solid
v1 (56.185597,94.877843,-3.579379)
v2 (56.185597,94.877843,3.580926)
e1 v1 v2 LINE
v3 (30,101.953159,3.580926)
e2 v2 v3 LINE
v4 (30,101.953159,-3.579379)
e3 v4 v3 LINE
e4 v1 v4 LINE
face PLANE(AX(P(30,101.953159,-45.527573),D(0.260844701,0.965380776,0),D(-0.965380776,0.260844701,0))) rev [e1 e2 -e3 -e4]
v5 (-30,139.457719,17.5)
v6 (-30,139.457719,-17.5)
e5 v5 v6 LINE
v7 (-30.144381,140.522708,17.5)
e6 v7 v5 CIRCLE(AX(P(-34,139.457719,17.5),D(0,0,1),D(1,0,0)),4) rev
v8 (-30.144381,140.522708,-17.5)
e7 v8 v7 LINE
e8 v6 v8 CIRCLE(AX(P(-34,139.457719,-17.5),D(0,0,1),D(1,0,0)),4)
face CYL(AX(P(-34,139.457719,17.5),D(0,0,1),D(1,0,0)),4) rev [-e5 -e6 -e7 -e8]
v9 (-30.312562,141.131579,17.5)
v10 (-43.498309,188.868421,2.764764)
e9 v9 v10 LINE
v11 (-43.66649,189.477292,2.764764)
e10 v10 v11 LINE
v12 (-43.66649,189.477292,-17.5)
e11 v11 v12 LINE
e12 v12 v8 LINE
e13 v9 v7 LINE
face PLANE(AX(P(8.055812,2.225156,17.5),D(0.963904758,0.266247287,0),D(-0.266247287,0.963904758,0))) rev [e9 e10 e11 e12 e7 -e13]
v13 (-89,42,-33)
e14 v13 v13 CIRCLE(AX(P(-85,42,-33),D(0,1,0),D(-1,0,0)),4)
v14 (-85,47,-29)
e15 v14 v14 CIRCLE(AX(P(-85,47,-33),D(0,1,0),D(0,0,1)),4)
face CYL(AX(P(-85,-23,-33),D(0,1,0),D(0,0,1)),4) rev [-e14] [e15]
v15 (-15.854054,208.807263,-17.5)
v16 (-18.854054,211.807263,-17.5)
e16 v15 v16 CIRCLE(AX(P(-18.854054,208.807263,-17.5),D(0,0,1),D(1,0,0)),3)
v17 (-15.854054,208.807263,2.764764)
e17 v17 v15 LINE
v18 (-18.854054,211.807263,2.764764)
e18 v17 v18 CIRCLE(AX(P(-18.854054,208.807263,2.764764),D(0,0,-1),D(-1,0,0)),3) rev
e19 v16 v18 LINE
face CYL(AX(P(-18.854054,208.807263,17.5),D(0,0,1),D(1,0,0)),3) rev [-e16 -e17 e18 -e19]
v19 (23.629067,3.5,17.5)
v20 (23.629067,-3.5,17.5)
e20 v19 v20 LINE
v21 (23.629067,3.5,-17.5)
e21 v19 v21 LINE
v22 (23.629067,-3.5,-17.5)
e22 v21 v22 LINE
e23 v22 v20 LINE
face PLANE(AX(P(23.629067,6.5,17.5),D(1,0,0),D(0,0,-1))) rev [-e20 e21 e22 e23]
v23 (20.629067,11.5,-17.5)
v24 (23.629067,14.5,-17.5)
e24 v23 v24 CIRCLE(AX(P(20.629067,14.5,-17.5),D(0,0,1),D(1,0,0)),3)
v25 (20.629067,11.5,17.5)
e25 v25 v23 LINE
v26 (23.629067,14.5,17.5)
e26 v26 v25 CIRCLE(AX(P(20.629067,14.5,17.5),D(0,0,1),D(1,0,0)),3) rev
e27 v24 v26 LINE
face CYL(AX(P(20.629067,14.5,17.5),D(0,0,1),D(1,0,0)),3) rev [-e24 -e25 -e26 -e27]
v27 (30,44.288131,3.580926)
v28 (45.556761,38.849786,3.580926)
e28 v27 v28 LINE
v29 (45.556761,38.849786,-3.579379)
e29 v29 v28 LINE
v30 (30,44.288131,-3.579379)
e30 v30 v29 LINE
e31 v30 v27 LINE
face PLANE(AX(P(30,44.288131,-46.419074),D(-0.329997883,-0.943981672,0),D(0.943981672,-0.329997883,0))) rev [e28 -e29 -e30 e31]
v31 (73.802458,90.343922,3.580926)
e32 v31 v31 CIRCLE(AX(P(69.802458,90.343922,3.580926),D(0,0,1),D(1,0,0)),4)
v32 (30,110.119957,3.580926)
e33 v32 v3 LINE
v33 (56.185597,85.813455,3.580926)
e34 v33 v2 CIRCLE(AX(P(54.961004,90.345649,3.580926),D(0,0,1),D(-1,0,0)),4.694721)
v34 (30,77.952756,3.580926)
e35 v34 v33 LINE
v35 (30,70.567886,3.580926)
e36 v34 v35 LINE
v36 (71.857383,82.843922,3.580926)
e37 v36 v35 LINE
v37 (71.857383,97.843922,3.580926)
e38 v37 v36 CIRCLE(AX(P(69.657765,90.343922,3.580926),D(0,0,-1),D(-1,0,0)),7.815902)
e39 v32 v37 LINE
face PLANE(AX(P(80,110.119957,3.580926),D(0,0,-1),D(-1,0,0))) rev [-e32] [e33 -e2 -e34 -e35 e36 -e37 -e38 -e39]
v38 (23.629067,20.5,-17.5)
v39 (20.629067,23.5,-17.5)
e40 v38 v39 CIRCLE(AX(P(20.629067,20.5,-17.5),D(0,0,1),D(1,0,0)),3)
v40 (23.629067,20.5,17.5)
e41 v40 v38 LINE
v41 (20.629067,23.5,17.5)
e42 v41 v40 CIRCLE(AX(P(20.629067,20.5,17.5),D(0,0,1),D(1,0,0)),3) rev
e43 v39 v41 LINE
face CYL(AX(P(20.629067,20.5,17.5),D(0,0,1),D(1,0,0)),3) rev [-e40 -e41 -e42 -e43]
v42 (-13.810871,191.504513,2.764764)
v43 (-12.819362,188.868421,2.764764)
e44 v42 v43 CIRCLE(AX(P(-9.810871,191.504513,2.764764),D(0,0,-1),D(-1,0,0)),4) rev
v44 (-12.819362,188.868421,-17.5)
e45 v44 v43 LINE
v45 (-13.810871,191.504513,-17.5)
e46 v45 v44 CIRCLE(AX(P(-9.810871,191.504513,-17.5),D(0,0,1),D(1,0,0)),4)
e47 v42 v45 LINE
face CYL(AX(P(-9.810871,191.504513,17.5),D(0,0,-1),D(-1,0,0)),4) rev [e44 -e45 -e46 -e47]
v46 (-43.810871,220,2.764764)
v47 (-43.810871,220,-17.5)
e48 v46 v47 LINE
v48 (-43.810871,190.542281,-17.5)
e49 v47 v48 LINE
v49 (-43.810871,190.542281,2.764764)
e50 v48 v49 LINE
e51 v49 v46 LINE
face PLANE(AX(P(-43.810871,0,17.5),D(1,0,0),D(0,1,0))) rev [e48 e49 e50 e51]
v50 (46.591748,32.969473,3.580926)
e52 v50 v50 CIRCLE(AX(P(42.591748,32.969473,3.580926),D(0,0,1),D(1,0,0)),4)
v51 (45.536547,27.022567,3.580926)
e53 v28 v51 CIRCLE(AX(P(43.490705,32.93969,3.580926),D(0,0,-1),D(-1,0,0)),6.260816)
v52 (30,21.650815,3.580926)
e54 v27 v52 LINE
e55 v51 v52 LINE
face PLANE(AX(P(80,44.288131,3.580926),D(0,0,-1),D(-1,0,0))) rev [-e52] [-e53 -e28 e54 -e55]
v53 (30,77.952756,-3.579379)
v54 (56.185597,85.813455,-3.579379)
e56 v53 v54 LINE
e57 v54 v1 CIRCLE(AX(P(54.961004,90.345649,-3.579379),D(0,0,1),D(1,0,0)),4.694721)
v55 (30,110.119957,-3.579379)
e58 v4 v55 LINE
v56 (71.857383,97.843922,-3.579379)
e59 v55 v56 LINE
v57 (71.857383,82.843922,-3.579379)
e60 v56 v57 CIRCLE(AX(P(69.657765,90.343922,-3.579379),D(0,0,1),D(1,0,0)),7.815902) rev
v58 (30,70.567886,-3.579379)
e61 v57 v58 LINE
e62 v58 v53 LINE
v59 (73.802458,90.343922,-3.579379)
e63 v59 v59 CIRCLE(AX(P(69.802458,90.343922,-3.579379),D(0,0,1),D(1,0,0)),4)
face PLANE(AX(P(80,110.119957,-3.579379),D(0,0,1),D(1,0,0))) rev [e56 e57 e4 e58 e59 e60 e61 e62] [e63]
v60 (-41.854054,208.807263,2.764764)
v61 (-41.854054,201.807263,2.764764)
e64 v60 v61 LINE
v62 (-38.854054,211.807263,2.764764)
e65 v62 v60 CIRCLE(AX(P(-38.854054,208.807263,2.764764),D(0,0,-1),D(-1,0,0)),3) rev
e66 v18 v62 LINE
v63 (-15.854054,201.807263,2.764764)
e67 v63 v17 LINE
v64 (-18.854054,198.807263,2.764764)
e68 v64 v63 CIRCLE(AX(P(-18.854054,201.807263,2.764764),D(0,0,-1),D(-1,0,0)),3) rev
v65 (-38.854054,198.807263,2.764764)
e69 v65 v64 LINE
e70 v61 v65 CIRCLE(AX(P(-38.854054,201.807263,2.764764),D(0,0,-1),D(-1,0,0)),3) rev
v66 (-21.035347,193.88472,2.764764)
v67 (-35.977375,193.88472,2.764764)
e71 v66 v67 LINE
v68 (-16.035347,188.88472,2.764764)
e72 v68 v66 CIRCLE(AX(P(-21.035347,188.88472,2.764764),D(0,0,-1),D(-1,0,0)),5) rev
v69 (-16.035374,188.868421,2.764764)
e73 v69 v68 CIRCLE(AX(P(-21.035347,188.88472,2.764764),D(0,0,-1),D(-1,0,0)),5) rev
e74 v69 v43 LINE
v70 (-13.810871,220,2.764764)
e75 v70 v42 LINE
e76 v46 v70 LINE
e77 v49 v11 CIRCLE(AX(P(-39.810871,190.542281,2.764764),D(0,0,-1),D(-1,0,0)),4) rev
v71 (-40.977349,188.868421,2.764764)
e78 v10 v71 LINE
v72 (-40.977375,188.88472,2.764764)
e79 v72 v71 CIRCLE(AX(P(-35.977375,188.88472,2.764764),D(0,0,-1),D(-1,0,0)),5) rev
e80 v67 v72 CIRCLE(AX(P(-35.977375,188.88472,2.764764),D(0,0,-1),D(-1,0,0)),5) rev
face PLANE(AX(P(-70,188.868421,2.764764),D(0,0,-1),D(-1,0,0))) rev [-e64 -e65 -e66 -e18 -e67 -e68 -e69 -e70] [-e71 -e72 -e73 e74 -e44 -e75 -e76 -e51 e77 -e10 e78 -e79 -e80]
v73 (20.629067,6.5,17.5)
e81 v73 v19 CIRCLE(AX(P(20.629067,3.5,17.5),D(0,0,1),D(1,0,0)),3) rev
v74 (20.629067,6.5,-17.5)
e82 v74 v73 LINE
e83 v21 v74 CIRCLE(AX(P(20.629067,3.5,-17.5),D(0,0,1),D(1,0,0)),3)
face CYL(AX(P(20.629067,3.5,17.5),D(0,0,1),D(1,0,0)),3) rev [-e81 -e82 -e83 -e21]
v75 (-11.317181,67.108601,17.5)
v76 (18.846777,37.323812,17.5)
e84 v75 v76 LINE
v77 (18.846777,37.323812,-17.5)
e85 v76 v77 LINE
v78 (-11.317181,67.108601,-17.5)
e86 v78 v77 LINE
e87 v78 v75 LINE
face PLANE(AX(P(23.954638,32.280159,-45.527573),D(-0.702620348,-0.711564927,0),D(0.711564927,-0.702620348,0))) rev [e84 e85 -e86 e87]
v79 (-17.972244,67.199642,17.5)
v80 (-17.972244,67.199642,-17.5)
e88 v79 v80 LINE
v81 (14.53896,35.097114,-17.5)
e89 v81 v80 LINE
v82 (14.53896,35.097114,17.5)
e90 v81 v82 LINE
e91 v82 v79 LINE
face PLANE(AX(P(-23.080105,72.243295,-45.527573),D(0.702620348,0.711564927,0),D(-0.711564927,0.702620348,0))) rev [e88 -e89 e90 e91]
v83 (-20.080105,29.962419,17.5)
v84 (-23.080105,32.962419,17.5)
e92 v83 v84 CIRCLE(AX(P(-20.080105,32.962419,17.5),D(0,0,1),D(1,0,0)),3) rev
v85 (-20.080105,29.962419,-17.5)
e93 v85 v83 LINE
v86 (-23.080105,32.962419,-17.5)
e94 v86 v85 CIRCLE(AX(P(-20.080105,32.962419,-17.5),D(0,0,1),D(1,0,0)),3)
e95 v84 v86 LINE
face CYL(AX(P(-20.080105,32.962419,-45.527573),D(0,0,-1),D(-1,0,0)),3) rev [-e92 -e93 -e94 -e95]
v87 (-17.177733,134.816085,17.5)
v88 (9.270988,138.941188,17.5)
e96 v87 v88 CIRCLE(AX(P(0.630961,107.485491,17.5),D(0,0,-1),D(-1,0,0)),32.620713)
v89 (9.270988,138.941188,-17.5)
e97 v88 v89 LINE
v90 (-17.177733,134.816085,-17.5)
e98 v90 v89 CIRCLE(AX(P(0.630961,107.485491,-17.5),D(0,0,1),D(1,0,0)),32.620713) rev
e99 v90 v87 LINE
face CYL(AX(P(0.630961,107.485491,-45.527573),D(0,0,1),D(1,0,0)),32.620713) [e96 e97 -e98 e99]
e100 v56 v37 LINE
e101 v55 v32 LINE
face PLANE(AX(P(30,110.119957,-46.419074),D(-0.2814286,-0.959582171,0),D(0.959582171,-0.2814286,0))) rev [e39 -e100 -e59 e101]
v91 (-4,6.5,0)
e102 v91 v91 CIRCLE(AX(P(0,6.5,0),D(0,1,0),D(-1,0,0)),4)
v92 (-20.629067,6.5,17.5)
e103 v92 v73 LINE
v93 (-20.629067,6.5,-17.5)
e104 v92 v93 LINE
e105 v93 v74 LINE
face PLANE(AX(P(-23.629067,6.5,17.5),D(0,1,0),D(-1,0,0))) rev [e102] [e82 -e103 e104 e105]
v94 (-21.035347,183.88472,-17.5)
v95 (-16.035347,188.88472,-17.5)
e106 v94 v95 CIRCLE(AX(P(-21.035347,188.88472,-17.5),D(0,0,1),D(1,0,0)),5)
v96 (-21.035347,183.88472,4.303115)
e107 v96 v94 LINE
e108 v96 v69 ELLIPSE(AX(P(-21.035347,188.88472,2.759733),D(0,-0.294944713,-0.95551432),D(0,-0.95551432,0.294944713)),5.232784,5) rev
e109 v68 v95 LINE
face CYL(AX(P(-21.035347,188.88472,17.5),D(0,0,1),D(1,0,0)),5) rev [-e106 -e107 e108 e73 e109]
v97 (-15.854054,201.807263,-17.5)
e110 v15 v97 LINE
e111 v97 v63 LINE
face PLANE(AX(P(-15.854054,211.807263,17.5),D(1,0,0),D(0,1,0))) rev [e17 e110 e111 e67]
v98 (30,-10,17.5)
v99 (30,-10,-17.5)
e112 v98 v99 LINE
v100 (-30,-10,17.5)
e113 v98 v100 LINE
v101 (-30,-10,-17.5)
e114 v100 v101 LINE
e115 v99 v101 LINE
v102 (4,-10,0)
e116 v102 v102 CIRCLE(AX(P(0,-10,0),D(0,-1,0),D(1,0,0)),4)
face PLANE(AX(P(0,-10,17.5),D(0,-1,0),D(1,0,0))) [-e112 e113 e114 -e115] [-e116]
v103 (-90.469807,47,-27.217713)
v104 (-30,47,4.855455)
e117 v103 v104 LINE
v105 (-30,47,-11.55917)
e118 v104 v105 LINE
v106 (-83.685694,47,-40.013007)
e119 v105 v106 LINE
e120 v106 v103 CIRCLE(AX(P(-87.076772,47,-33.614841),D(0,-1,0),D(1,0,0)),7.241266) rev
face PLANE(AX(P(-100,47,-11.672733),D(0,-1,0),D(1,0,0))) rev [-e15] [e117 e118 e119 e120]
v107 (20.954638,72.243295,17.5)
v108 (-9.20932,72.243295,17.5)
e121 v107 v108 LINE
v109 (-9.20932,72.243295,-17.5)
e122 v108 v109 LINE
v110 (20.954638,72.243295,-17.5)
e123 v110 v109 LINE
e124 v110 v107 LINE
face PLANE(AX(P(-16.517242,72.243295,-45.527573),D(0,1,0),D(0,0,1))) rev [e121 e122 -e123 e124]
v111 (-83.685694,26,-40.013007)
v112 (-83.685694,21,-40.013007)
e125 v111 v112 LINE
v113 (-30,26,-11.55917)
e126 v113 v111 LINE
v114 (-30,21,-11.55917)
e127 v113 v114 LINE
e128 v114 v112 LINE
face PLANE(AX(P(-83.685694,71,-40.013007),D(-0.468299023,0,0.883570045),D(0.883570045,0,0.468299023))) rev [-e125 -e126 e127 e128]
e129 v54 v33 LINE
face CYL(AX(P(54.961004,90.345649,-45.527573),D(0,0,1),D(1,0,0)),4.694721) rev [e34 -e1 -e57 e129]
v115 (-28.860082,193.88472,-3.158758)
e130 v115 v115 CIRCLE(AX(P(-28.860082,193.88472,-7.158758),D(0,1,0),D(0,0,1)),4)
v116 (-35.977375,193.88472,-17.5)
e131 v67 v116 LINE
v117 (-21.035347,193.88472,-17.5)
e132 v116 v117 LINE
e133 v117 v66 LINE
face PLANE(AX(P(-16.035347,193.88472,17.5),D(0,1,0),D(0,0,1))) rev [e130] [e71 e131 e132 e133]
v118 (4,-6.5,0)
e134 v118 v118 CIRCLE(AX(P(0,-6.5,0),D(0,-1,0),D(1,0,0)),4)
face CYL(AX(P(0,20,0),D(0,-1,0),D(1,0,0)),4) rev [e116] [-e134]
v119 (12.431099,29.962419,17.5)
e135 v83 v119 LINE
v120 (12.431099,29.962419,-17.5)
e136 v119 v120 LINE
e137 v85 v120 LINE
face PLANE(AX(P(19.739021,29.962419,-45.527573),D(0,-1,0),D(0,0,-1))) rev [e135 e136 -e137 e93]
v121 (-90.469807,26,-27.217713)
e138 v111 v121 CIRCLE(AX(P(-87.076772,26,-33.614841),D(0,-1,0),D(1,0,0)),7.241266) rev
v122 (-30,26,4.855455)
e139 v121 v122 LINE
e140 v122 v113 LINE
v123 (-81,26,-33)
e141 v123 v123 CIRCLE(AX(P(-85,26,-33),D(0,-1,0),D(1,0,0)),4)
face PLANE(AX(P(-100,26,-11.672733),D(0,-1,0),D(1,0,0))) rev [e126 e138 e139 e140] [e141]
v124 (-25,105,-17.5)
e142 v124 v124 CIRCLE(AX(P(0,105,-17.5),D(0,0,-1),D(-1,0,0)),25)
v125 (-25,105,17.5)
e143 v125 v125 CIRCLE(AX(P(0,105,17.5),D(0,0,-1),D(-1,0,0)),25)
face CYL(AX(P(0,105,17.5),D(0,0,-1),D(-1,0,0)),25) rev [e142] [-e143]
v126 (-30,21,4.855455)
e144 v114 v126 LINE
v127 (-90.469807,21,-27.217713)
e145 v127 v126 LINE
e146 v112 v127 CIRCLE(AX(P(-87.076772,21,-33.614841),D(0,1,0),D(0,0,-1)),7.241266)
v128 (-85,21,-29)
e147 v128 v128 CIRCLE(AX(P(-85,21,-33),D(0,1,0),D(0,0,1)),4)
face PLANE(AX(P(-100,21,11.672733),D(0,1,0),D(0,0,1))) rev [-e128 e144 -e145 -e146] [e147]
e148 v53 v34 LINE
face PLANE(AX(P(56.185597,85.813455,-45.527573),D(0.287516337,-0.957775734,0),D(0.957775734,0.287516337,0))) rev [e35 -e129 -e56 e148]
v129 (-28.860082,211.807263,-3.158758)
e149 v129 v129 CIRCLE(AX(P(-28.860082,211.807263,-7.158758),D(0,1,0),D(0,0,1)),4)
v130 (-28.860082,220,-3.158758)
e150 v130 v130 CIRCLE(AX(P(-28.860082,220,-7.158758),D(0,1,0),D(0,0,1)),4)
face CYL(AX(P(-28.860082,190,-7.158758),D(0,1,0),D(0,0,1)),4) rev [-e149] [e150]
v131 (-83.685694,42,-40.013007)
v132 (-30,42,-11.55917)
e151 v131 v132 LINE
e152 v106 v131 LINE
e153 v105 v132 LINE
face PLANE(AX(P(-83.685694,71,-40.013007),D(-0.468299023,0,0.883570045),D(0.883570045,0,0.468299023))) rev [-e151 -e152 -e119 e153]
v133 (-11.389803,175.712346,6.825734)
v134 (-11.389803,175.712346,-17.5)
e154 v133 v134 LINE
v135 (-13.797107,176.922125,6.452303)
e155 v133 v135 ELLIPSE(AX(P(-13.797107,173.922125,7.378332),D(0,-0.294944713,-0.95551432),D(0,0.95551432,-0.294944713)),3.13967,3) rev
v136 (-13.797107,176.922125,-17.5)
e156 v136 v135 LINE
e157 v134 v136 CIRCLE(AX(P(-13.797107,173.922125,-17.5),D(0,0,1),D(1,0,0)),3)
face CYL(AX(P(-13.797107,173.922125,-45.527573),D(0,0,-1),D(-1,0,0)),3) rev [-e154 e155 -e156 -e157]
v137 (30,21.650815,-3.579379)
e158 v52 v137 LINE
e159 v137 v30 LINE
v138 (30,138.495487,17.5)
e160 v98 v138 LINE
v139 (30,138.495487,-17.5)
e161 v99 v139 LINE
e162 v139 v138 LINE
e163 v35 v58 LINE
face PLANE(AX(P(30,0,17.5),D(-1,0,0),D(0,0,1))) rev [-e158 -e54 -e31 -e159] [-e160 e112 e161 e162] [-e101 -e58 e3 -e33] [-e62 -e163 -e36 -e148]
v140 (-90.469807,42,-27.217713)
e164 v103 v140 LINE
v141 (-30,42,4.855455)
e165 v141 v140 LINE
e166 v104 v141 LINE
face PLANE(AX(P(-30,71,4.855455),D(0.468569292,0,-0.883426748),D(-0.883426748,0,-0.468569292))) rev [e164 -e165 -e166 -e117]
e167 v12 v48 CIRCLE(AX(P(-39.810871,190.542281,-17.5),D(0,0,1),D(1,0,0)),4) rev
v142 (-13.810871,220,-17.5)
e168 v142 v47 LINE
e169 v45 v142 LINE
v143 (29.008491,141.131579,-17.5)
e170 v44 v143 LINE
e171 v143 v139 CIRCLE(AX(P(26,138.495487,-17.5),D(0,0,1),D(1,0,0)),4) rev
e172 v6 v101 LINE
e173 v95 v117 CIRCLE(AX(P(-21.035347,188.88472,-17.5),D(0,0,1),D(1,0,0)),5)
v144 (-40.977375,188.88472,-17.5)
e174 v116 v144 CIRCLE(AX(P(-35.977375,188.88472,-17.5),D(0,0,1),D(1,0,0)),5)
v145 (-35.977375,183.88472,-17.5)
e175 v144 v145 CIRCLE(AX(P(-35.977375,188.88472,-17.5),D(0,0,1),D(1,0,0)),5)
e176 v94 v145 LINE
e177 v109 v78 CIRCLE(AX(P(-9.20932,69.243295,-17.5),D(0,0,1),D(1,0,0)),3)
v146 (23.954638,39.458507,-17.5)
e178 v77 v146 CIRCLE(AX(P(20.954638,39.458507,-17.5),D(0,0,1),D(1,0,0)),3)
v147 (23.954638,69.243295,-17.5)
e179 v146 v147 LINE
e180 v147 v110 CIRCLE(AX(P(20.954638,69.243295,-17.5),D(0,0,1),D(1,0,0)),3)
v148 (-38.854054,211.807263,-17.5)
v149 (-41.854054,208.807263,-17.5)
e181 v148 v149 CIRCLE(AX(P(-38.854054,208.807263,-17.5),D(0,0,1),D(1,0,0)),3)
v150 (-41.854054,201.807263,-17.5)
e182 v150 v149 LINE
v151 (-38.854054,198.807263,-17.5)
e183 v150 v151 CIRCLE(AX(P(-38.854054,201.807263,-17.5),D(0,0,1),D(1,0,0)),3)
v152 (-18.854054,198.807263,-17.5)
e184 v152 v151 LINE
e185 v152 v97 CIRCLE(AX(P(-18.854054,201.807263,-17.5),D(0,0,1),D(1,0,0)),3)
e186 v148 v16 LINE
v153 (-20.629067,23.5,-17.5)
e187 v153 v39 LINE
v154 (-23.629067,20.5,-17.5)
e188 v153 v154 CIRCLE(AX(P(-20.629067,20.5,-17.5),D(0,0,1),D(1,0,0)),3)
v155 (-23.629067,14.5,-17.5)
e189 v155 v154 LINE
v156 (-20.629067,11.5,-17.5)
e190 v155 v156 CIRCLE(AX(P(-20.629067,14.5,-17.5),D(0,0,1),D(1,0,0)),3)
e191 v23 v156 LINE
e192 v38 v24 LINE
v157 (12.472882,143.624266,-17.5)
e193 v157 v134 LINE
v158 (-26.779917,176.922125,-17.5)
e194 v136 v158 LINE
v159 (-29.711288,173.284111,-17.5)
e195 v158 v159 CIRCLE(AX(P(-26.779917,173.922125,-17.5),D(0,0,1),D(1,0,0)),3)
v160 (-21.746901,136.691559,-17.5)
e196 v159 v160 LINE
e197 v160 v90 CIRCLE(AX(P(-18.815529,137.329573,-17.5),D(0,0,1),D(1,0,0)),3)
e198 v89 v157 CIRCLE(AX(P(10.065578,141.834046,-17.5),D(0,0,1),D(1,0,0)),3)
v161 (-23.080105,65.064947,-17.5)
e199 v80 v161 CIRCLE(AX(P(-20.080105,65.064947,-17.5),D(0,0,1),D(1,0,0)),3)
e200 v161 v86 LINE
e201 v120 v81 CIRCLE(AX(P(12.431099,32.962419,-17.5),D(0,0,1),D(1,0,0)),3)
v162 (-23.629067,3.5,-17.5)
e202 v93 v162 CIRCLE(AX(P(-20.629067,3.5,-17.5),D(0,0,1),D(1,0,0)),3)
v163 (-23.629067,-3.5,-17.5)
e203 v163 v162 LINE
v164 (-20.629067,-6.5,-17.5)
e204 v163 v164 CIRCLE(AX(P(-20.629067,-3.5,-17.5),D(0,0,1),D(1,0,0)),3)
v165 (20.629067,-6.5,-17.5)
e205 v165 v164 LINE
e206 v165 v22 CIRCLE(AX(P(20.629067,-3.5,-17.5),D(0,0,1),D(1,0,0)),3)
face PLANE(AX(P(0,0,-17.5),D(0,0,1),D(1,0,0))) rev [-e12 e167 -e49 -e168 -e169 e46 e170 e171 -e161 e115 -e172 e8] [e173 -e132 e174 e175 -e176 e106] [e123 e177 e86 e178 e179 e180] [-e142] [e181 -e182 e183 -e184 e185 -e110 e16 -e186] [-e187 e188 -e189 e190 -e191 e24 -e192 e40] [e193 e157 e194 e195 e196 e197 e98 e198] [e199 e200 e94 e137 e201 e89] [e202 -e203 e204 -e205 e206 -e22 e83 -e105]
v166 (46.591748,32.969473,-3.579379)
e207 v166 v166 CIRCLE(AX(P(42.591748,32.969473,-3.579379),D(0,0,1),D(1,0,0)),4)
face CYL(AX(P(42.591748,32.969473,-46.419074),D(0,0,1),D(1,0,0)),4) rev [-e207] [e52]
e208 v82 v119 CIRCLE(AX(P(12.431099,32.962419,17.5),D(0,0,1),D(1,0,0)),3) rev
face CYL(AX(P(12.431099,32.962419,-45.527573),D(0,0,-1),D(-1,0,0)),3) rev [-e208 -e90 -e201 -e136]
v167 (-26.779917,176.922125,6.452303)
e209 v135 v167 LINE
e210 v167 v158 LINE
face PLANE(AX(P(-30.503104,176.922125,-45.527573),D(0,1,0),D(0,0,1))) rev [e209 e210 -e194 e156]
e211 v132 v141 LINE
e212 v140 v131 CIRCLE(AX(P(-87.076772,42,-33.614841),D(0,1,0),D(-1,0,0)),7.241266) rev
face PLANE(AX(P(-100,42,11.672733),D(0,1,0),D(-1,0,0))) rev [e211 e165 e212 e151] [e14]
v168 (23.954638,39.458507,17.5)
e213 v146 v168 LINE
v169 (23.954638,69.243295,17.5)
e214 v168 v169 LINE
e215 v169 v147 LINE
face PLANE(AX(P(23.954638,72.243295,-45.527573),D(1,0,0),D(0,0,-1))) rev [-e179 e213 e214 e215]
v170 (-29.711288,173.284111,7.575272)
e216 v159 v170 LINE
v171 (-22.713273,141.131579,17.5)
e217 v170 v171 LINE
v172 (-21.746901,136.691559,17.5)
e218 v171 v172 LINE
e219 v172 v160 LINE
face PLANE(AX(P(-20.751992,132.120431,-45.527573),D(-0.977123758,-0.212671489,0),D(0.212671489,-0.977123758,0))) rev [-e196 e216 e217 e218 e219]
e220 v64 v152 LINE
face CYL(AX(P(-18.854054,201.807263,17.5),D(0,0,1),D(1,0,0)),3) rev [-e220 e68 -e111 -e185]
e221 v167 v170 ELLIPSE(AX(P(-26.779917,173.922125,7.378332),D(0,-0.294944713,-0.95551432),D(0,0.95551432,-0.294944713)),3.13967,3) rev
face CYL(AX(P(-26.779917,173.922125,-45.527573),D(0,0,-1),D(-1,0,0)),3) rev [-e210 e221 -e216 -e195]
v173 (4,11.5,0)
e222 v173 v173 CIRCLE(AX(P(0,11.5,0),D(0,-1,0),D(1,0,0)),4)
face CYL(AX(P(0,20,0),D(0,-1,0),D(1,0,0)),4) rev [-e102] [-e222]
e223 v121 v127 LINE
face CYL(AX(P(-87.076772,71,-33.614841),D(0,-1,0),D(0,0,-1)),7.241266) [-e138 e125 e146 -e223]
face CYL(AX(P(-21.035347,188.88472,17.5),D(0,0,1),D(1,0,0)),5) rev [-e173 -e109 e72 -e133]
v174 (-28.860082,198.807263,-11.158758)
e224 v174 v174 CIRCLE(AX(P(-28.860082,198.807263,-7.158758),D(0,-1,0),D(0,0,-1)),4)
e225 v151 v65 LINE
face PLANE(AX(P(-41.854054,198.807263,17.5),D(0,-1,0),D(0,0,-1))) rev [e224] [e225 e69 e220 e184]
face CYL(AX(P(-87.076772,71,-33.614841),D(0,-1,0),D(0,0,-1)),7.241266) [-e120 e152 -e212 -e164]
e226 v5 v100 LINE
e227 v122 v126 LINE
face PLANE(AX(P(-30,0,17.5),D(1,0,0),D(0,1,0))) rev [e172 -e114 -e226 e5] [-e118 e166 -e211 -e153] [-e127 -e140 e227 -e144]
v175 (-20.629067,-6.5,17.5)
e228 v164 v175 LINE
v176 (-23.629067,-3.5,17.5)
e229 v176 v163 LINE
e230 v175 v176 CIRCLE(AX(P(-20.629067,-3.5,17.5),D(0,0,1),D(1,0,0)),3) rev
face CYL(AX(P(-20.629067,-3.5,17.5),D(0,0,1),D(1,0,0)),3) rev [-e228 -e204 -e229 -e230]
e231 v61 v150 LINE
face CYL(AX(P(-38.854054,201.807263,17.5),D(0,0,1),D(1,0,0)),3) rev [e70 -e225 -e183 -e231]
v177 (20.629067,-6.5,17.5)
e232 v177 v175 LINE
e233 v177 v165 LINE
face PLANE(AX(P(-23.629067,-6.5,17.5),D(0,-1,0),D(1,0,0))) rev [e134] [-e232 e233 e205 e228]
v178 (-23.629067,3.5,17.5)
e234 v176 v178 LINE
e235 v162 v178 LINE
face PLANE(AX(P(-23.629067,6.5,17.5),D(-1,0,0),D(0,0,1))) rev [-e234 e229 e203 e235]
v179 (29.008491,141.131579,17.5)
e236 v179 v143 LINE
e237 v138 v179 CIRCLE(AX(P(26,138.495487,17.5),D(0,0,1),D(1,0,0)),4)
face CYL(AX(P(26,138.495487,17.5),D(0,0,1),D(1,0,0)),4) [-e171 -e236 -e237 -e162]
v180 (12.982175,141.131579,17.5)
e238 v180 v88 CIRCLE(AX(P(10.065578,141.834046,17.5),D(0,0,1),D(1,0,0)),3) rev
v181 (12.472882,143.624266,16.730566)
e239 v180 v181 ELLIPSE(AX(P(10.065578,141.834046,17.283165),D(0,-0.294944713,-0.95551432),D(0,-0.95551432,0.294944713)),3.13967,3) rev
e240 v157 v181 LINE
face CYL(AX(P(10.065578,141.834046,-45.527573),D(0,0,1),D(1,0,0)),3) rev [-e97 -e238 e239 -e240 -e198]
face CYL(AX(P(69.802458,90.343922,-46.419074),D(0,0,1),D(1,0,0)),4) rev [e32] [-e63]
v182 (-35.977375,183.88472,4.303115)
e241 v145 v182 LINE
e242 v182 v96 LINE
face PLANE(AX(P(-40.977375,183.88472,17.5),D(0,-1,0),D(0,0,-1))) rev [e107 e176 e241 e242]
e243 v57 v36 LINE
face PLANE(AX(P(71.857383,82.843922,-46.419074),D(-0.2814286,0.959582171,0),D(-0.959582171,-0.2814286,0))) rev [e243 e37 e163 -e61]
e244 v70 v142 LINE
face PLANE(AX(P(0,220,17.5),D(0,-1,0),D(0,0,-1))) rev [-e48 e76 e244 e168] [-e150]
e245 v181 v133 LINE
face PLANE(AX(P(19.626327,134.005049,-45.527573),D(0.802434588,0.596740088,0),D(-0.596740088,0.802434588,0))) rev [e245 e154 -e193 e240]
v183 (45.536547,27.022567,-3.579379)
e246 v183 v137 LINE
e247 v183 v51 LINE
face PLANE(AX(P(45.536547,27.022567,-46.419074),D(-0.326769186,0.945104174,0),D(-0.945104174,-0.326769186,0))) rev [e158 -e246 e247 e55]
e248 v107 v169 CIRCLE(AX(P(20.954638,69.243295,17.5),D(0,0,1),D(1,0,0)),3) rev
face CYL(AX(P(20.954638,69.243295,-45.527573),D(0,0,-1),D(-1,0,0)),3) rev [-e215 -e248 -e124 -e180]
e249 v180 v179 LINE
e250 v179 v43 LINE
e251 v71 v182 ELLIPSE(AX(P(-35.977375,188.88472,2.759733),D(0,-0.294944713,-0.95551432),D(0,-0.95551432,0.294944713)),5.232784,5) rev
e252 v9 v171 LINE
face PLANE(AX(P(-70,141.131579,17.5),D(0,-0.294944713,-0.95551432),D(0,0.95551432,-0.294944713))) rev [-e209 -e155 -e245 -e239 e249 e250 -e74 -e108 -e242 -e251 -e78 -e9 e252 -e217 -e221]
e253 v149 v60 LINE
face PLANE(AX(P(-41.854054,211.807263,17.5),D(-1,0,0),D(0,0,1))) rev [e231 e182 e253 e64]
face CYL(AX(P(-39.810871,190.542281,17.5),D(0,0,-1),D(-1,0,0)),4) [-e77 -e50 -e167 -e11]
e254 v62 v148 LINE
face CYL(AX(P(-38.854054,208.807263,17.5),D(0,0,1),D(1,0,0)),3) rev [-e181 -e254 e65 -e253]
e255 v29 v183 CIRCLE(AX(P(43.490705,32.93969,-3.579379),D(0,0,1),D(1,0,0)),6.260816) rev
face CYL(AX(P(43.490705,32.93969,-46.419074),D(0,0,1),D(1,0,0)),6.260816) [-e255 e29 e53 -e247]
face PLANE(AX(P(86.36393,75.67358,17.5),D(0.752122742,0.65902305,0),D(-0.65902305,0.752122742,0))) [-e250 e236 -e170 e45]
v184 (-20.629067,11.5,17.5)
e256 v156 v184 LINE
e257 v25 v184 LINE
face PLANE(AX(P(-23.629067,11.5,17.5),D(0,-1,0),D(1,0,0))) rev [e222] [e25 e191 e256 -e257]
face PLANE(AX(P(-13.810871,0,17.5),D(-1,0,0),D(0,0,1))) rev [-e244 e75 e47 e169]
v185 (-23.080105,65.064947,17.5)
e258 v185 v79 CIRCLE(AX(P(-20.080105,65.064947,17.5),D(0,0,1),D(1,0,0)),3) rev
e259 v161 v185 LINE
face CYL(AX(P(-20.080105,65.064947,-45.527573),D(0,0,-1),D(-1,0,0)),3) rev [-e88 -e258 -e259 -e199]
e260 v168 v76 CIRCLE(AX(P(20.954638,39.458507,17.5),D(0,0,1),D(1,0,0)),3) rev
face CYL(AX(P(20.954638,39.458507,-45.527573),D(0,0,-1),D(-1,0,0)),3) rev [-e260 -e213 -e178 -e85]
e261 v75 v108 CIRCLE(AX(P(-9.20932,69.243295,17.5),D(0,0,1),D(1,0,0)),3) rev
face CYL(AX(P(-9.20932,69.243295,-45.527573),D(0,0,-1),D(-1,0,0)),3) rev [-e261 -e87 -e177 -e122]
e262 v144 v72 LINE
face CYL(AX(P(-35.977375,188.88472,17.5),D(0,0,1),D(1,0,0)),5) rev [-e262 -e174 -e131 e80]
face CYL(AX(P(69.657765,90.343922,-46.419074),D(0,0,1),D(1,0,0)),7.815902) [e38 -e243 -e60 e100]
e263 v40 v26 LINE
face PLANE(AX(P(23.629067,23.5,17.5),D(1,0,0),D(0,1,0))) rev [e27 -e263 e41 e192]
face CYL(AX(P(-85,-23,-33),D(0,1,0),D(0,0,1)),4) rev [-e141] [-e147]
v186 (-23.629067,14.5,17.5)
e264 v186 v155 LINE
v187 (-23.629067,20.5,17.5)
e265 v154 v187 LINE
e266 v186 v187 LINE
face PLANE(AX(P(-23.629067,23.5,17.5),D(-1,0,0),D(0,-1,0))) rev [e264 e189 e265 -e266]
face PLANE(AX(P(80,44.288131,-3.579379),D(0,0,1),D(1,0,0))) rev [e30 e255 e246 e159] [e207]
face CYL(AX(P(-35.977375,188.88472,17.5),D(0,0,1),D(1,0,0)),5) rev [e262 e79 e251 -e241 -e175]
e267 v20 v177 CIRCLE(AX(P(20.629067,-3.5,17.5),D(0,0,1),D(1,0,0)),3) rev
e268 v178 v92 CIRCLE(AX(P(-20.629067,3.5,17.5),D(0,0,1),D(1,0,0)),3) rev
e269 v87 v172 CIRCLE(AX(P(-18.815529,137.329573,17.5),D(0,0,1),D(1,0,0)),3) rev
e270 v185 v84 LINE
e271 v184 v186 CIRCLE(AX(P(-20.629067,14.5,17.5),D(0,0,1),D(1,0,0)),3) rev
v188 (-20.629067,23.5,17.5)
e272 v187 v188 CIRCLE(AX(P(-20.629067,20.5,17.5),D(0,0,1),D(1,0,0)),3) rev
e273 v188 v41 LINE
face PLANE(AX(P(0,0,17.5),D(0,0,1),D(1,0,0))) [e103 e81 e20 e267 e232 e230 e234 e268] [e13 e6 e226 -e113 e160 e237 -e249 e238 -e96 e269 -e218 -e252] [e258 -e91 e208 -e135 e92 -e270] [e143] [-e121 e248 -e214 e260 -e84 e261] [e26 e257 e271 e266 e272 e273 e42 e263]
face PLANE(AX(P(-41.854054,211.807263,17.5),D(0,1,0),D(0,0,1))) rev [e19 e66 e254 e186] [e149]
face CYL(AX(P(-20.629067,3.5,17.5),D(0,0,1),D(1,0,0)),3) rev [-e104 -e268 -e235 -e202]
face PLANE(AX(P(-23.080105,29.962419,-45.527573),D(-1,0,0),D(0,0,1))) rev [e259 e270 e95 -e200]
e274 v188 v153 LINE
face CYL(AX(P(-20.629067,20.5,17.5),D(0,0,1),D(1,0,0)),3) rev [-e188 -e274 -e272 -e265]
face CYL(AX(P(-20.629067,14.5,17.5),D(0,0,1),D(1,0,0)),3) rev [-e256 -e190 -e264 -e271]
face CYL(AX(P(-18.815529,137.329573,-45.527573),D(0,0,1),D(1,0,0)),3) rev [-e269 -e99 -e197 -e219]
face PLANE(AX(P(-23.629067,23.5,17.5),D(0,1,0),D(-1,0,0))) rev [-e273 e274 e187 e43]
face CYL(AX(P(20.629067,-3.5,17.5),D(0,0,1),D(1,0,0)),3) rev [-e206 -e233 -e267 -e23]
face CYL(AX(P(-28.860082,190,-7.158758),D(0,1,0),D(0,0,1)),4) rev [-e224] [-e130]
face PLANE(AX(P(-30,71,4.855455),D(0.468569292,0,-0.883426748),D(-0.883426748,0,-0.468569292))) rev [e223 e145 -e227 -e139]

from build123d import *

# Parameters (mm, degrees)
BOSS_EXTRUDE1_DEPTH = 17.5
SKETCH6_W           = 24.942027916
SKETCH6_H           = 10
SKETCH6_W_2         = 47.258134024
SKETCH6_H_2         = 13
SKETCH6_H_3         = 12
SKETCH6_W_3         = 26
CUT_EXTRUDE1_DEPTH  = 228.033901494
SKETCH7_R           = 25
CUT_EXTRUDE2_DEPTH  = 228.033901494
SKETCH8_R           = 4
CUT_EXTRUDE3_DEPTH  = 30
SKETCH10_R          = 4
CUT_EXTRUDE4_DEPTH  = 30
SKETCH11_W          = 7.160304618
SKETCH11_H          = 39.552070702
SKETCH11_H_2        = 22.637315958
BOSS_EXTRUDE2_DEPTH = 50
SKETCH13_R          = 4
CUT_EXTRUDE5_DEPTH  = 50
CUT_EXTRUDE6_DEPTH  = 50
CUT_EXTRUDE7_DEPTH  = 50
BOSS_EXTRUDE3_DEPTH = 70
SKETCH19_R          = 4
CUT_EXTRUDE8_DEPTH  = 70
FILLET4_R           = 5
CUT_EXTRUDE11_DEPTH = 250.744819662
FILLET5_R           = 3
FILLET6_R           = 3
CUT_EXTRUDE12_DEPTH = 250.744819662
FILLET9_R           = 3
CUT_EXTRUDE13_DEPTH = 247.600171616
FILLET10_R          = 3
CUT_EXTRUDE14_DEPTH = 50
FILLET11_R          = 4
CUT_EXTRUDE16_DEPTH = 100


with BuildPart() as part:
    # Sketch1 → Boss-Extrude1 (new, symmetric)
    with BuildSketch(Plane.XY):
        Polygon((30, -10), (-30, -10), (-30, 140), (-43.810871114, 190), (-43.810871114, 220), (-13.810871114, 220), (-13.810871114, 190), (30, 140), align=None)
    extrude(amount=BOSS_EXTRUDE1_DEPTH, both=True)

    # Sketch6 → Cut-Extrude1 (cut, through all)
    with BuildSketch(Plane(origin=(0, 0, -17.5), x_dir=(-1, 0, 0), z_dir=(0, 0, -1))):
        with Locations((28.506361164, 188.88472005)):
            Rectangle(SKETCH6_W, SKETCH6_H)
        Rectangle(SKETCH6_W_2, SKETCH6_H_2)
        with Locations((0, 17.5)):
            Rectangle(SKETCH6_W_2, SKETCH6_H_3)
        with Locations((28.85405418, 205.307263481)):
            Rectangle(SKETCH6_W_3, SKETCH6_H_2)
    extrude(amount=-CUT_EXTRUDE1_DEPTH, mode=Mode.SUBTRACT)

    # Sketch7 → Cut-Extrude2 (cut, through all)
    with BuildSketch(Plane(origin=(0, 0, -17.5), x_dir=(-1, 0, 0), z_dir=(0, 0, -1))):
        with Locations((0, 105)):
            Circle(SKETCH7_R)
    extrude(amount=-CUT_EXTRUDE2_DEPTH, mode=Mode.SUBTRACT)

    # Sketch8 → Cut-Extrude3 (cut)
    with BuildSketch(Plane(origin=(0, 220, 0), x_dir=(1, 0, 0), z_dir=(0, 1, 0))):
        with Locations(Location((-28.860081831, 7.158757746, 0), (0, 0, 270))):
            Circle(SKETCH8_R)
    extrude(amount=-CUT_EXTRUDE3_DEPTH, mode=Mode.SUBTRACT)

    # Sketch10 → Cut-Extrude4 (cut)
    with BuildSketch(Plane.XZ.offset(10)):
        Circle(SKETCH10_R)
    extrude(amount=-CUT_EXTRUDE4_DEPTH, mode=Mode.SUBTRACT)

    # Sketch11 → Boss-Extrude2 (add)
    with BuildSketch(Plane(origin=(30, 0, 0), x_dir=(0, 0, -1), z_dir=(1, 0, 0))):
        with Locations((-0.000773436, 90.343921661)):
            Rectangle(SKETCH11_W, SKETCH11_H)
        with Locations((-0.000773436, 32.969473472)):
            Rectangle(SKETCH11_W, SKETCH11_H_2)
    extrude(amount=BOSS_EXTRUDE2_DEPTH)

    # Sketch13 → Cut-Extrude5 (cut)
    with BuildSketch(Plane.XY.offset(3.580925745)):
        with Locations((69.802457577, 90.343921661)):
            Circle(SKETCH13_R)
        with Locations((42.591748381, 32.969473472)):
            Circle(SKETCH13_R)
    extrude(amount=-CUT_EXTRUDE5_DEPTH, mode=Mode.SUBTRACT)

    # Sketch14 → Cut-Extrude6 (cut)
    with BuildSketch(Plane.XY.offset(3.580925745)):
        with BuildLine():
            Line((30, 110.119957012), (71.857382865, 97.843921661))
            ThreePointArc((71.857382865, 97.843921661), (77.47366635, 90.343921661), (71.857382865, 82.843921661))
            Line((71.857382865, 82.843921661), (30, 70.56788631))
            Line((30, 70.56788631), (80, 70.56788631))
            Line((80, 70.56788631), (80, 110.119957012))
            Line((80, 110.119957012), (30, 110.119957012))
        make_face()
    extrude(amount=-CUT_EXTRUDE6_DEPTH, mode=Mode.SUBTRACT)

    # Sketch15 → Cut-Extrude7 (cut)
    with BuildSketch(Plane.XY.offset(3.580925745)):
        with BuildLine():
            Line((30, 44.288131451), (80, 44.288131451))
            Line((80, 44.288131451), (80, 21.650815493))
            Line((80, 21.650815493), (30, 21.650815493))
            Line((30, 21.650815493), (45.536546747, 27.022566957))
            ThreePointArc((45.536546747, 27.022566957), (49.751512, 32.928989945), (45.556761025, 38.849786248))
            Line((45.556761025, 38.849786248), (30, 44.288131451))
        make_face()
    extrude(amount=-CUT_EXTRUDE7_DEPTH, mode=Mode.SUBTRACT)

    # Sketch18 → Boss-Extrude3 (add)
    with BuildSketch(Plane.ZY.offset(30)):
        Polygon((11.672732765, 47), (-11.672732765, 47), (-45.527572918, 47), (-45.527572918, 42), (-11.672732765, 42), (11.672732765, 42), align=None)
        Polygon((-11.672732765, 26), (-45.212973929, 26), (-45.212973929, 21), (-11.672732765, 21), (11.672732765, 21), (11.672732765, 26), align=None)
    extrude(amount=BOSS_EXTRUDE3_DEPTH)

    # Sketch19 → Cut-Extrude8 (cut)
    with BuildSketch(Plane(origin=(0, 47, 0), x_dir=(1, 0, 0), z_dir=(0, 1, 0))):
        with Locations(Location((-85, 33, 0), (0, 0, 270))):
            Circle(SKETCH19_R)
    extrude(amount=-CUT_EXTRUDE8_DEPTH, mode=Mode.SUBTRACT)

    # Fillet4
    fillet4_edges = [part.edges().sort_by_distance(p)[0] for p in [
        (-40.977375122, 183.88472005, 0),
        (-16.035347206, 183.88472005, 0),
        (-16.035347206, 193.88472005, 0),
        (-40.977375122, 193.88472005, 0),
    ]]
    fillet(fillet4_edges, radius=FILLET4_R - 0.0001)  # a hair under: the kernel refuses the full size

    # Sketch24 → Cut-Extrude11 (cut, through all)
    with BuildSketch(Plane.XY.offset(17.5)):
        Polygon((-23.080104547, 29.96241896), (-23.080104547, 72.243295408), (19.739020818, 29.96241896), align=None)
        Polygon((-16.517242483, 72.243295408), (23.954637672, 72.243295408), (23.954637672, 32.280158612), align=None)
    extrude(amount=-CUT_EXTRUDE11_DEPTH, mode=Mode.SUBTRACT)

    # Fillet5
    fillet5_edges = [part.edges().sort_by_distance(p)[0] for p in [
        (-16.517242483, 72.243295408, 0),
        (23.954637672, 72.243295408, 0),
    ]]
    fillet(fillet5_edges, radius=FILLET5_R)

    # Fillet6
    fillet6_edges = [part.edges().sort_by_distance(p)[0] for p in [
        (23.954637672, 32.280158612, 0),
        (19.739020818, 29.96241896, 0),
        (-23.080104547, 29.96241896, 0),
        (-23.080104547, 72.243295408, 0),
    ]]
    fillet(fillet6_edges, radius=FILLET6_R)

    # Sketch25 → Cut-Extrude12 (cut, through all)
    with BuildSketch(Plane.XY.offset(17.5)):
        with BuildLine():
            Line((19.626327343, 134.005049283), (-12.289470121, 176.922125419))
            Line((-12.289470121, 176.922125419), (-30.503104083, 176.922125419))
            Line((-30.503104083, 176.922125419), (-20.751992176, 132.120430764))
            ThreePointArc((-20.751992176, 132.120430764), (-0.889923513, 140.07073059), (19.626327343, 134.005049283))
        make_face()
    extrude(amount=-CUT_EXTRUDE12_DEPTH, mode=Mode.SUBTRACT)

    # Fillet9
    fillet9_edges = [part.edges().sort_by_distance(p)[0] for p in [
        (19.626327343, 134.005049283, 0),
        (-20.751992176, 132.120430764, 0),
        (-30.503104083, 176.922125419, 0),
        (-12.289470121, 176.922125419, 0),
    ]]
    fillet(fillet9_edges, radius=FILLET9_R)

    # Sketch26 → Cut-Extrude13 (cut, through all)
    with BuildSketch(Plane.XY.offset(3.580925745)):
        with BuildLine():
            Line((30, 101.953158871), (56.185596991, 94.877842692))
            ThreePointArc((56.185596991, 94.877842692), (59.655725238, 90.345648843), (56.185596991, 85.813454995))
            Line((56.185596991, 85.813454995), (30, 77.952755802))
            Line((30, 77.952755802), (30, 101.953158871))
        make_face()
    extrude(amount=-CUT_EXTRUDE13_DEPTH, mode=Mode.SUBTRACT)

    # Fillet10
    fillet10_edges = [part.edges().sort_by_distance(p)[0] for p in [
        (23.629067012, -6.5, 0),
        (23.629067012, 6.5, 0),
        (-23.629067012, 6.5, 0),
        (-23.629067012, -6.5, 0),
        (-15.85405418, 198.807263481, 0),
        (-15.85405418, 211.807263481, 0),
        (-41.85405418, 211.807263481, 0),
        (-41.85405418, 198.807263481, 0),
        (23.629067012, 11.5, 0),
        (23.629067012, 23.5, 0),
        (-23.629067012, 23.5, 0),
        (-23.629067012, 11.5, 0),
    ]]
    fillet(fillet10_edges, radius=FILLET10_R)

    # Sketch29 → Cut-Extrude14 (cut)
    with BuildSketch(Plane.XZ.offset(-21)):
        with BuildLine():
            Line((-30, 4.855454999), (-90.46980655, -27.217712952))
            ThreePointArc((-90.46980655, -27.217712952), (-93.474418669, -37.006897491), (-83.685693812, -40.01300687))
            Line((-83.685693812, -40.01300687), (-30, -11.55916998))
            Line((-30, -11.55916998), (-30, -45.527572918))
            Line((-30, -45.527572918), (-100, -45.527572918))
            Line((-100, -45.527572918), (-100, 11.672732765))
            Line((-100, 11.672732765), (-30, 11.672732765))
            Line((-30, 11.672732765), (-30, 4.855454999))
        make_face()
    extrude(amount=-CUT_EXTRUDE14_DEPTH, mode=Mode.SUBTRACT)

    # Fillet11
    fillet11_edges = [part.edges().sort_by_distance(p)[0] for p in [
        (-30, 140, 0),
        (-43.810871114, 190, 0),
        (-13.810871114, 190, 0),
        (30, 140, 0),
    ]]
    fillet(fillet11_edges, radius=FILLET11_R)

    # Sketch31 → Cut-Extrude16 (cut)
    with BuildSketch(Plane(origin=(30, 0, 0), x_dir=(0, 0, -1), z_dir=(1, 0, 0))):
        Polygon((-17.5, 141.131578769), (-2.764763692, 188.868421231), (-2.764763692, 220), (-17.5, 220), align=None)
    extrude(amount=-CUT_EXTRUDE16_DEPTH, mode=Mode.SUBTRACT)


solid = part.part
